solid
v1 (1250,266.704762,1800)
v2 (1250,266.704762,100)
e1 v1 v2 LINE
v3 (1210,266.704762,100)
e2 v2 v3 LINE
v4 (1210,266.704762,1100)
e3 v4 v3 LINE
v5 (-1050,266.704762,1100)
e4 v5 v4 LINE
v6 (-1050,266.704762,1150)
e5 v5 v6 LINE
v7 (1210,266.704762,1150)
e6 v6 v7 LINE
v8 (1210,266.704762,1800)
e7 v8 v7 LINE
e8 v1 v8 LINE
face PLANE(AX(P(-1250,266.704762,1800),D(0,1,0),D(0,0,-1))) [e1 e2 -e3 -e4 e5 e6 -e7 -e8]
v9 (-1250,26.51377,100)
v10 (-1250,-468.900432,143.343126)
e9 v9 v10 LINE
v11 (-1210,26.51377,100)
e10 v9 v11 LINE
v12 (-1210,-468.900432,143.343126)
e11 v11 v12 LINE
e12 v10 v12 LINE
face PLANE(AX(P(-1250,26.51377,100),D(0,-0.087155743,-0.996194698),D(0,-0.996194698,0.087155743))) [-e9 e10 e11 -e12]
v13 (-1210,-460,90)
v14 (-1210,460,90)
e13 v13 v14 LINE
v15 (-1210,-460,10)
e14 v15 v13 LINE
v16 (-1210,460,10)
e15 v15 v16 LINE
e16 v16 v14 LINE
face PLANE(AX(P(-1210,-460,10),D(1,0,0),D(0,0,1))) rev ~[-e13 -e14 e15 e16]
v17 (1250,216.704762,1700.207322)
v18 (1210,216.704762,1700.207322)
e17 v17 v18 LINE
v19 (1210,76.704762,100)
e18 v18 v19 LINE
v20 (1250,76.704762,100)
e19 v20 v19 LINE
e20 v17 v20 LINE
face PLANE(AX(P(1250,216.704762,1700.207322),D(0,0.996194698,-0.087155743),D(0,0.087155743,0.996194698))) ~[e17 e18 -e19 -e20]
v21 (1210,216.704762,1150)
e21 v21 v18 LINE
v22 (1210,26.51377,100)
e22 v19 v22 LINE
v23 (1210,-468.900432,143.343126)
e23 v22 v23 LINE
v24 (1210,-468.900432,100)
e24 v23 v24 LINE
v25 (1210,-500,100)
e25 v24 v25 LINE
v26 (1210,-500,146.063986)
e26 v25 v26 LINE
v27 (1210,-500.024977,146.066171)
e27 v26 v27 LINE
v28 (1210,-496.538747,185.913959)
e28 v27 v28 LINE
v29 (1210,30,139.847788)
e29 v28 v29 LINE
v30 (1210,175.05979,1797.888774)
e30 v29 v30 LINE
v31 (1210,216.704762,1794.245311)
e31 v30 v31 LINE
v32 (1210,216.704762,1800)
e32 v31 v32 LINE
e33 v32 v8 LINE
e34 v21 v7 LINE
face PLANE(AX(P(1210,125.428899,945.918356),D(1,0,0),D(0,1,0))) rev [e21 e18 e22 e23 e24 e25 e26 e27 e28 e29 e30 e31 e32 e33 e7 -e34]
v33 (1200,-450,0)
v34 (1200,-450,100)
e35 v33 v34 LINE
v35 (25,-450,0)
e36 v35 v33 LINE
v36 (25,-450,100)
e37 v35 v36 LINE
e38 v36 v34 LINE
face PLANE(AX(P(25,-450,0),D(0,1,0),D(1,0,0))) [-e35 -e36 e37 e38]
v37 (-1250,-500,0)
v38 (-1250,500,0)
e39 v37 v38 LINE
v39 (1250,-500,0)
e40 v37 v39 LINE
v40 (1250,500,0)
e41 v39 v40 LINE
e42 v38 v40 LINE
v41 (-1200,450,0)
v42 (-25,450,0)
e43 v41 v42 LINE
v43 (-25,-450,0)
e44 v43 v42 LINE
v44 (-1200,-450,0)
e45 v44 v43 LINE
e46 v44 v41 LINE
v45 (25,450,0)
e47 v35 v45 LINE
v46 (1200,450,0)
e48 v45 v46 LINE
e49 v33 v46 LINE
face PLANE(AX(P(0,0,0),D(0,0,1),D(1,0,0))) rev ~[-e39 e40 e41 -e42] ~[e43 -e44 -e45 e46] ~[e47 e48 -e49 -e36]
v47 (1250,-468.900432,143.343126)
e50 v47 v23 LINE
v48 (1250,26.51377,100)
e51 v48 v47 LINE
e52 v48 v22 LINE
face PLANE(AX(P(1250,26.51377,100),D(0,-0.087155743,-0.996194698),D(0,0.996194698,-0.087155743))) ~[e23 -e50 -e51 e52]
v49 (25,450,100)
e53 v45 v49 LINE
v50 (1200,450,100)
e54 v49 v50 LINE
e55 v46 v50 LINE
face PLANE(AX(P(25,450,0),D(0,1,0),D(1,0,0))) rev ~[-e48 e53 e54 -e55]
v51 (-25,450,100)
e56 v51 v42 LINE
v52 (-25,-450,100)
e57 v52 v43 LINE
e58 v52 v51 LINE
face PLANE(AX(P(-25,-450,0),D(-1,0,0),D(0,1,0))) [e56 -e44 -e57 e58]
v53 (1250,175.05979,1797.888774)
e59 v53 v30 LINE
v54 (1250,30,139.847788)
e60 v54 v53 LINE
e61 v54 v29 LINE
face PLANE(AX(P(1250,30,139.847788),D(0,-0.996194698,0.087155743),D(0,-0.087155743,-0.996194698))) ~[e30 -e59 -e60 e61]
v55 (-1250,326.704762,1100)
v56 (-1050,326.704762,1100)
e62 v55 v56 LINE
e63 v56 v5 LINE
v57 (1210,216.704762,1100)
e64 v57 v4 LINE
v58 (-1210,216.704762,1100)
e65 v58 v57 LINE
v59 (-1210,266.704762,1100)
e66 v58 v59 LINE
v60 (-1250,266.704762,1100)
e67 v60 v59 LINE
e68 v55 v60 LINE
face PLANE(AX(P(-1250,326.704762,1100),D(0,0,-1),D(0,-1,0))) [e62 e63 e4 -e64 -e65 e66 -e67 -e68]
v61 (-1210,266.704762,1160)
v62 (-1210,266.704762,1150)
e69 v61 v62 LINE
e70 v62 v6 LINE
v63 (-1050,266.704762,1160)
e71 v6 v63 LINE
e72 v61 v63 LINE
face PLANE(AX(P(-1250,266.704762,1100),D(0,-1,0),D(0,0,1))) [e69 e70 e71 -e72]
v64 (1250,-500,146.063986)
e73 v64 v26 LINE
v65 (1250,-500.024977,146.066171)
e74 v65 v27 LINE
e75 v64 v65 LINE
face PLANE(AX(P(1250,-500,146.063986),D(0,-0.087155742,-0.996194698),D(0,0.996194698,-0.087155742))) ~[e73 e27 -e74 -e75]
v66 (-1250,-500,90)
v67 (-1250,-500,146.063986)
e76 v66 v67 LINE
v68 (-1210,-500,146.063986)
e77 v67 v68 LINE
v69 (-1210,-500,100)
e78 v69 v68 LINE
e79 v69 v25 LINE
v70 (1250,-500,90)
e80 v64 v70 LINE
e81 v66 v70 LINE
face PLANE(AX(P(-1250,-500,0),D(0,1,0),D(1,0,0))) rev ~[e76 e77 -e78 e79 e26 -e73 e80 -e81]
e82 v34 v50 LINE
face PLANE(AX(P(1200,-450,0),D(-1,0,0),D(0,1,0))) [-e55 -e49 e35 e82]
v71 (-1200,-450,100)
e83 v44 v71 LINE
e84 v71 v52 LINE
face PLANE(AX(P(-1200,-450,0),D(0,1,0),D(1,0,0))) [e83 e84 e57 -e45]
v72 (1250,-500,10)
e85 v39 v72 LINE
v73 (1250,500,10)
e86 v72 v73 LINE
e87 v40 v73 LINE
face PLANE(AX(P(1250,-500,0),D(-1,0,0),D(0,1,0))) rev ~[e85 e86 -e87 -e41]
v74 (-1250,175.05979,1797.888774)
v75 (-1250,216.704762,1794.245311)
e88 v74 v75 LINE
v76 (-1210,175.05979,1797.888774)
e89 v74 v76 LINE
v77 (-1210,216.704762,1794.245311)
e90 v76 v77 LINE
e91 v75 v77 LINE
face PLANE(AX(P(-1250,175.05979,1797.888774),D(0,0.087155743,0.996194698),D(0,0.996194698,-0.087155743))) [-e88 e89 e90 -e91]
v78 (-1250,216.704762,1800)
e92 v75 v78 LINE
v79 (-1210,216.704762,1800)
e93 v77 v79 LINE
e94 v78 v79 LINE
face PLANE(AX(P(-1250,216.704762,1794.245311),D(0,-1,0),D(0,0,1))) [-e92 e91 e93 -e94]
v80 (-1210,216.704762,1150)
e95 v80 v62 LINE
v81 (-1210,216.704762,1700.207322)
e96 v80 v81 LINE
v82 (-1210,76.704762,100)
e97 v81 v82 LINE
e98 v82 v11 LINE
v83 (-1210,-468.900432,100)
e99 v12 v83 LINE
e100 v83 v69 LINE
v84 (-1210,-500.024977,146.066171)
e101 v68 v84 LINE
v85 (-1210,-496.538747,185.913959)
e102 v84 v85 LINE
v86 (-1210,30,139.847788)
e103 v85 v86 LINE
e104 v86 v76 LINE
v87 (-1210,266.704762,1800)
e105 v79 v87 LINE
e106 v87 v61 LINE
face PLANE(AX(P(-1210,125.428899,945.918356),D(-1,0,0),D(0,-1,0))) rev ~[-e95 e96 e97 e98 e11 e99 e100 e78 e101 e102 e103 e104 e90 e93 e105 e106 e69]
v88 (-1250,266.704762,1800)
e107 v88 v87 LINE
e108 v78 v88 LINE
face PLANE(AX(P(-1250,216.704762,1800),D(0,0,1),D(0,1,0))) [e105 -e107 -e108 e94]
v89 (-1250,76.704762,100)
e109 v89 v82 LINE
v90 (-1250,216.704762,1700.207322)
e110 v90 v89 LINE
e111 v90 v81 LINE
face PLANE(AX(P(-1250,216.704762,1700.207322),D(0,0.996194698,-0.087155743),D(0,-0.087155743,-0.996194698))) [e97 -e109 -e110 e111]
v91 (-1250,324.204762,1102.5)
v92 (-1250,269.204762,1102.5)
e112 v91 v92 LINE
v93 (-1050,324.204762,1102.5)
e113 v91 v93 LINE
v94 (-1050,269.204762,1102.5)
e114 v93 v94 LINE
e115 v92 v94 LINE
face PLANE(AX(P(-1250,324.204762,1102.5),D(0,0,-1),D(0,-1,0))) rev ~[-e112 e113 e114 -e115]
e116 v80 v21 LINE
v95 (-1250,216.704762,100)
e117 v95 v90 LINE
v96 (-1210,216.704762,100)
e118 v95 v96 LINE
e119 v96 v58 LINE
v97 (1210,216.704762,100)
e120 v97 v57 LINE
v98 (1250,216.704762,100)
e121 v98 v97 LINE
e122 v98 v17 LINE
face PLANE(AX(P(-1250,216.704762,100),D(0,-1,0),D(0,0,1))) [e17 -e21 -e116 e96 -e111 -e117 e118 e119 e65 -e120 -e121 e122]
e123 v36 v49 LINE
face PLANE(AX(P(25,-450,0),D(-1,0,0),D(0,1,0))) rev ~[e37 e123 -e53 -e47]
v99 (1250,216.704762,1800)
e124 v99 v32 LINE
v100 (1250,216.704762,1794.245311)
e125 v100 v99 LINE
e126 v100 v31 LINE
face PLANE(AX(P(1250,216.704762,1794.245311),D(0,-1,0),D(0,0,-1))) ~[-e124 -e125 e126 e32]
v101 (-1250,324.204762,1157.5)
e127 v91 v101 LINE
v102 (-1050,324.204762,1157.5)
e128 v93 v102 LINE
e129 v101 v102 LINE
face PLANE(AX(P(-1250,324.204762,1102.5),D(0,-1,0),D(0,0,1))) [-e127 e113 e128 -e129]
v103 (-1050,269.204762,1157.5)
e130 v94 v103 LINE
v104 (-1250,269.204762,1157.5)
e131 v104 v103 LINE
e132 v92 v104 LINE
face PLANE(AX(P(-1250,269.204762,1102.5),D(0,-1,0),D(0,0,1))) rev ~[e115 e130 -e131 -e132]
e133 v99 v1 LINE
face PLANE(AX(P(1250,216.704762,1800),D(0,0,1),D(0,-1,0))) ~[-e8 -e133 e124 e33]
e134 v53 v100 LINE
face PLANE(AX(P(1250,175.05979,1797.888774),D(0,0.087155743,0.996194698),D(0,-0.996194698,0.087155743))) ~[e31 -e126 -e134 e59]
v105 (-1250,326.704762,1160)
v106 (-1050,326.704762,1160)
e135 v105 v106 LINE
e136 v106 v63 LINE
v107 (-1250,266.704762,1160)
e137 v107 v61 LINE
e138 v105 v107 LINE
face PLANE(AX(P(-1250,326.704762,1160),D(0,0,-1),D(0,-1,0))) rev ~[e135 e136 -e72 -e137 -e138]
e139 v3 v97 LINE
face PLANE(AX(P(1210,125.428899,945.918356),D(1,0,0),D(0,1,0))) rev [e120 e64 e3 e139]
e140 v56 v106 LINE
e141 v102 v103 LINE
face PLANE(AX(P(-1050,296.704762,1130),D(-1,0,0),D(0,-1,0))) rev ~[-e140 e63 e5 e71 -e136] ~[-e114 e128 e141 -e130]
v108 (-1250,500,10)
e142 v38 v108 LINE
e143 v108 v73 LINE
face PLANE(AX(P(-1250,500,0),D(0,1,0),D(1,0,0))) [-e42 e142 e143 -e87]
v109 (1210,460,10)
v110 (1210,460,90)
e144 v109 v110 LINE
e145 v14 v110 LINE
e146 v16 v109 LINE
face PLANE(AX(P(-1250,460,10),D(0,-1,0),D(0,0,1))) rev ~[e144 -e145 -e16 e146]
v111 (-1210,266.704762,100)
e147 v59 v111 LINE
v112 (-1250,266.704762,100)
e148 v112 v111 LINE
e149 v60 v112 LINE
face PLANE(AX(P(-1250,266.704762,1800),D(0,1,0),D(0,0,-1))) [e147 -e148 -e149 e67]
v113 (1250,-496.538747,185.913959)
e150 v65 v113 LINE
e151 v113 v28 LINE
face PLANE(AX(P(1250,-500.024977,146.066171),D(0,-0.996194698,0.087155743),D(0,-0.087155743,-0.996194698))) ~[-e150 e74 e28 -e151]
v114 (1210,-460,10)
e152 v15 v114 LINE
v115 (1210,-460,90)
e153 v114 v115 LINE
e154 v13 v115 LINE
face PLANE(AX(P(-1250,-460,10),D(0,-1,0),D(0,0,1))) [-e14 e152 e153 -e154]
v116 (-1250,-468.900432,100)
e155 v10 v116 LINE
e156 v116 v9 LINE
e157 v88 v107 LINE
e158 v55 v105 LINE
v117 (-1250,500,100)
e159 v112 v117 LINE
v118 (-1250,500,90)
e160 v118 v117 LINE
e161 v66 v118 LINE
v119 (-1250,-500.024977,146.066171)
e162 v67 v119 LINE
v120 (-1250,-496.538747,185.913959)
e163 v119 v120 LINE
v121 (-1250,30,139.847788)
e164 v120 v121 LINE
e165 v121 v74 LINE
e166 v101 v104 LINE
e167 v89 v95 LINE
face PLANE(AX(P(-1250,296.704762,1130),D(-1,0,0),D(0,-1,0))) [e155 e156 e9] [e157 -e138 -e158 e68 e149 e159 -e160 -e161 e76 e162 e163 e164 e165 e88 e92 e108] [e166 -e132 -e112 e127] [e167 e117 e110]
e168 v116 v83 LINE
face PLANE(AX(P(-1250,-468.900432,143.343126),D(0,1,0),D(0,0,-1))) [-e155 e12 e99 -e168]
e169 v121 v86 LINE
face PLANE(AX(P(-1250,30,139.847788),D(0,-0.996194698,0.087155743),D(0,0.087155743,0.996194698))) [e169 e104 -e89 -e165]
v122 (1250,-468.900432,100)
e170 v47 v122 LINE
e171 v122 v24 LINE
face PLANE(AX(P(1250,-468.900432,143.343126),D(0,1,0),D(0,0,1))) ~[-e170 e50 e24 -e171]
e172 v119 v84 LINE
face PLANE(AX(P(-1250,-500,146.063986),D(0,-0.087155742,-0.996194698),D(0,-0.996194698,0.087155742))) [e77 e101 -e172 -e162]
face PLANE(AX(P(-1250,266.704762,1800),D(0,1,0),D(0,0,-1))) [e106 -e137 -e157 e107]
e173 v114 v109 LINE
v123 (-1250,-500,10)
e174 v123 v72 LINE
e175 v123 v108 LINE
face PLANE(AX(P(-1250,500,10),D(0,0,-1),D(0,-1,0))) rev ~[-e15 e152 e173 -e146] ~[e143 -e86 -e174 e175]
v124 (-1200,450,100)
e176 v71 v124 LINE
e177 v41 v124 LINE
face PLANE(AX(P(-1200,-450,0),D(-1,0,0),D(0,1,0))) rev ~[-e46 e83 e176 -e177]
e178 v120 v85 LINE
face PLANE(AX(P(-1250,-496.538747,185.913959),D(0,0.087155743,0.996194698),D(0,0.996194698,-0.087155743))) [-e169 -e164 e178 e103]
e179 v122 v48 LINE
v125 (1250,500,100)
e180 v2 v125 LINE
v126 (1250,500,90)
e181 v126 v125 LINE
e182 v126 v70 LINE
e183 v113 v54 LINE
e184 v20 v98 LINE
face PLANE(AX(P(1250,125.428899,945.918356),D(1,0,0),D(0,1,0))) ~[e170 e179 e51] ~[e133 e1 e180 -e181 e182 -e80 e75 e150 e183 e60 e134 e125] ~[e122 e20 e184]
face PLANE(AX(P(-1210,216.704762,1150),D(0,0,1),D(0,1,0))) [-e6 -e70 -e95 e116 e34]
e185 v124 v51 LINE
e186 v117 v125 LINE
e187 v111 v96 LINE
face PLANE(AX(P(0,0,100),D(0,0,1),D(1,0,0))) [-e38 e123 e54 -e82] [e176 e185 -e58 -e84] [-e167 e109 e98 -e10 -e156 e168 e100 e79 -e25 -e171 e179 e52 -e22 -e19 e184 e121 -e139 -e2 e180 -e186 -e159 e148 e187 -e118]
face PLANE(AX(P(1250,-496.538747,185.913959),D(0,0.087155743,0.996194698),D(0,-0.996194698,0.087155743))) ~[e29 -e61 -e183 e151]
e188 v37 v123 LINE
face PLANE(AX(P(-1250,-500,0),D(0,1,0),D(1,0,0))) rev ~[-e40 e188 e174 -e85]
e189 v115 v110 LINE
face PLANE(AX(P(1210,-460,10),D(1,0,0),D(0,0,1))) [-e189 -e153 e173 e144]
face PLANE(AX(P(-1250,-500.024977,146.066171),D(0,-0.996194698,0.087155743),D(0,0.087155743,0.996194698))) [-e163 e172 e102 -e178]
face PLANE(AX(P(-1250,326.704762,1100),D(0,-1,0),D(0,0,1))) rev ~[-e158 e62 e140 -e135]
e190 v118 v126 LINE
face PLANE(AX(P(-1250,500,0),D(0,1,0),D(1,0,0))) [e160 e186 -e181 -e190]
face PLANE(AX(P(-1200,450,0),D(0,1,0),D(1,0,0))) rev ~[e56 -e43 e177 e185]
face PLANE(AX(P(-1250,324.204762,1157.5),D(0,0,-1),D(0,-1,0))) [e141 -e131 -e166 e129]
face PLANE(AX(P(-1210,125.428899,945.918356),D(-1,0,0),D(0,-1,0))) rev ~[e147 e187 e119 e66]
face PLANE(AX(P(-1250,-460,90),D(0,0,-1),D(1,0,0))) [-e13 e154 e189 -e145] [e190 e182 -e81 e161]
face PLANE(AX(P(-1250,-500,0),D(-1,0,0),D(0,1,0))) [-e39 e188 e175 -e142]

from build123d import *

# Parameters (mm, degrees)
F0_W          = 2500
F0_H          = 1000
F0_W_2        = 1175
F0_H_2        = 900
F1_DEPTH      = 100
F2_W          = 40
F2_H          = 80
F3_DEPTH      = 2500.001
F4_W          = 40
F4_H          = 80
F5_DEPTH      = 960.001
F6_W          = 90
F6_H          = 80
F7_DEPTH      = 450
F7_DEPTH_BACK = 450
F9_DEPTH      = 40
F11_W         = 50
F11_H         = 50
F12_DEPTH     = 2420
F13_W         = 60
F13_H         = 60
F13_W_2       = 55
F13_H_2       = 55
F14_DEPTH     = 200


# Not quite as in the source:
# - a feature names something its author has since deleted; it is built from what else it names


with BuildPart() as f1:
    # F0 (on Top) → F1 (new body)
    with BuildSketch(Plane.XY):
        Rectangle(F0_W, F0_H)
        with Locations((-612.5, 0)):
            Rectangle(F0_W_2, F0_H_2, mode=Mode.SUBTRACT)
        with Locations((612.5, 0)):
            Rectangle(F0_W_2, F0_H_2, mode=Mode.SUBTRACT)
    extrude(amount=F1_DEPTH)

    # F2 (on face) → F3 (cut, through all)
    with BuildSketch(Plane(origin=(-1250, 0, 0), x_dir=(0, -1, 0), z_dir=(-1, 0, 0))):
        with Locations((-480, 50)):
            Rectangle(F2_W, F2_H)
        with Locations((480, 50)):
            Rectangle(F2_W, F2_H)
    extrude(amount=-F3_DEPTH, mode=Mode.SUBTRACT)

    # F4 (on face) → F5 (cut, through all)
    with BuildSketch(Plane.XZ.offset(460)):
        with Locations((1230, 50)):
            Rectangle(F4_W, F4_H)
        with Locations((-1230, 50)):
            Rectangle(F4_W, F4_H)
    extrude(amount=-F5_DEPTH, mode=Mode.SUBTRACT)

    # F6 (on Front) → F7 (cut, two sides)
    with BuildSketch(Plane.XZ) as f7_sk:
        with Locations((-45, 50)):
            Rectangle(F6_W, F6_H)
    extrude(amount=-F7_DEPTH, mode=Mode.SUBTRACT)
    extrude(f7_sk.sketch, amount=F7_DEPTH_BACK, mode=Mode.SUBTRACT)

    # F8 (on face) → F9 (join)
    with BuildSketch(Plane(origin=(-1250, 0, 0), x_dir=(0, -1, 0), z_dir=(-1, 0, 0))):
        Polygon((-216.7047621673, 1700.2073223866), (-76.7047621673, 100), (-26.5137702901, 100), (-30, 139.8477879237), (-175.0597899337, 1797.8887738934), (-216.7047621673, 1794.2453109301), align=None)
        Polygon((-224.8695248383, 1793.530986756), (-216.7047621673, 1700.2073223866), (-216.7047621673, 1794.2453109301), align=None)
        Polygon((-30, 139.8477879237), (-26.5137702901, 100), (468.9004319267, 143.3431264437), (500, 146.0639860907), (500.0249770351, 146.0661712981), (496.5387473252, 185.9139592218), align=None)
        Polygon((500, 146.0639860907), (468.9004319267, 143.3431264437), (468.9004319267, 100), (500, 100), align=None)
        Polygon((-216.7047621673, 100), (-216.7047621673, 1700.2073223866), (-224.8695248383, 1793.530986756), (-216.7047621673, 1794.2453109301), (-216.7047621673, 1800), (-266.7047621673, 1800), (-266.7047621673, 100), align=None)
    extrude(amount=-F9_DEPTH)

    # F10: F1 across plane


with BuildPart() as f1_1:
    add(f1.part)
    add(f1.part.mirror(Plane.YZ))

    # F11 (on face) → F12 (join, through all)
    with BuildSketch(Plane.YZ.offset(-1210)):
        with Locations((241.7047621673, 1125)):
            Rectangle(F11_W, F11_H)
    extrude(amount=F12_DEPTH)

    # F13 (on face) → F14 (join)
    with BuildSketch(Plane(origin=(-1250, 0, 0), x_dir=(0, -1, 0), z_dir=(-1, 0, 0))):
        with Locations((-296.7047621673, 1130)):
            Rectangle(F13_W, F13_H)
        with Locations((-296.7047621673, 1130)):
            Rectangle(F13_W_2, F13_H_2, mode=Mode.SUBTRACT)
    extrude(amount=-F14_DEPTH)


solid = f1_1.part
